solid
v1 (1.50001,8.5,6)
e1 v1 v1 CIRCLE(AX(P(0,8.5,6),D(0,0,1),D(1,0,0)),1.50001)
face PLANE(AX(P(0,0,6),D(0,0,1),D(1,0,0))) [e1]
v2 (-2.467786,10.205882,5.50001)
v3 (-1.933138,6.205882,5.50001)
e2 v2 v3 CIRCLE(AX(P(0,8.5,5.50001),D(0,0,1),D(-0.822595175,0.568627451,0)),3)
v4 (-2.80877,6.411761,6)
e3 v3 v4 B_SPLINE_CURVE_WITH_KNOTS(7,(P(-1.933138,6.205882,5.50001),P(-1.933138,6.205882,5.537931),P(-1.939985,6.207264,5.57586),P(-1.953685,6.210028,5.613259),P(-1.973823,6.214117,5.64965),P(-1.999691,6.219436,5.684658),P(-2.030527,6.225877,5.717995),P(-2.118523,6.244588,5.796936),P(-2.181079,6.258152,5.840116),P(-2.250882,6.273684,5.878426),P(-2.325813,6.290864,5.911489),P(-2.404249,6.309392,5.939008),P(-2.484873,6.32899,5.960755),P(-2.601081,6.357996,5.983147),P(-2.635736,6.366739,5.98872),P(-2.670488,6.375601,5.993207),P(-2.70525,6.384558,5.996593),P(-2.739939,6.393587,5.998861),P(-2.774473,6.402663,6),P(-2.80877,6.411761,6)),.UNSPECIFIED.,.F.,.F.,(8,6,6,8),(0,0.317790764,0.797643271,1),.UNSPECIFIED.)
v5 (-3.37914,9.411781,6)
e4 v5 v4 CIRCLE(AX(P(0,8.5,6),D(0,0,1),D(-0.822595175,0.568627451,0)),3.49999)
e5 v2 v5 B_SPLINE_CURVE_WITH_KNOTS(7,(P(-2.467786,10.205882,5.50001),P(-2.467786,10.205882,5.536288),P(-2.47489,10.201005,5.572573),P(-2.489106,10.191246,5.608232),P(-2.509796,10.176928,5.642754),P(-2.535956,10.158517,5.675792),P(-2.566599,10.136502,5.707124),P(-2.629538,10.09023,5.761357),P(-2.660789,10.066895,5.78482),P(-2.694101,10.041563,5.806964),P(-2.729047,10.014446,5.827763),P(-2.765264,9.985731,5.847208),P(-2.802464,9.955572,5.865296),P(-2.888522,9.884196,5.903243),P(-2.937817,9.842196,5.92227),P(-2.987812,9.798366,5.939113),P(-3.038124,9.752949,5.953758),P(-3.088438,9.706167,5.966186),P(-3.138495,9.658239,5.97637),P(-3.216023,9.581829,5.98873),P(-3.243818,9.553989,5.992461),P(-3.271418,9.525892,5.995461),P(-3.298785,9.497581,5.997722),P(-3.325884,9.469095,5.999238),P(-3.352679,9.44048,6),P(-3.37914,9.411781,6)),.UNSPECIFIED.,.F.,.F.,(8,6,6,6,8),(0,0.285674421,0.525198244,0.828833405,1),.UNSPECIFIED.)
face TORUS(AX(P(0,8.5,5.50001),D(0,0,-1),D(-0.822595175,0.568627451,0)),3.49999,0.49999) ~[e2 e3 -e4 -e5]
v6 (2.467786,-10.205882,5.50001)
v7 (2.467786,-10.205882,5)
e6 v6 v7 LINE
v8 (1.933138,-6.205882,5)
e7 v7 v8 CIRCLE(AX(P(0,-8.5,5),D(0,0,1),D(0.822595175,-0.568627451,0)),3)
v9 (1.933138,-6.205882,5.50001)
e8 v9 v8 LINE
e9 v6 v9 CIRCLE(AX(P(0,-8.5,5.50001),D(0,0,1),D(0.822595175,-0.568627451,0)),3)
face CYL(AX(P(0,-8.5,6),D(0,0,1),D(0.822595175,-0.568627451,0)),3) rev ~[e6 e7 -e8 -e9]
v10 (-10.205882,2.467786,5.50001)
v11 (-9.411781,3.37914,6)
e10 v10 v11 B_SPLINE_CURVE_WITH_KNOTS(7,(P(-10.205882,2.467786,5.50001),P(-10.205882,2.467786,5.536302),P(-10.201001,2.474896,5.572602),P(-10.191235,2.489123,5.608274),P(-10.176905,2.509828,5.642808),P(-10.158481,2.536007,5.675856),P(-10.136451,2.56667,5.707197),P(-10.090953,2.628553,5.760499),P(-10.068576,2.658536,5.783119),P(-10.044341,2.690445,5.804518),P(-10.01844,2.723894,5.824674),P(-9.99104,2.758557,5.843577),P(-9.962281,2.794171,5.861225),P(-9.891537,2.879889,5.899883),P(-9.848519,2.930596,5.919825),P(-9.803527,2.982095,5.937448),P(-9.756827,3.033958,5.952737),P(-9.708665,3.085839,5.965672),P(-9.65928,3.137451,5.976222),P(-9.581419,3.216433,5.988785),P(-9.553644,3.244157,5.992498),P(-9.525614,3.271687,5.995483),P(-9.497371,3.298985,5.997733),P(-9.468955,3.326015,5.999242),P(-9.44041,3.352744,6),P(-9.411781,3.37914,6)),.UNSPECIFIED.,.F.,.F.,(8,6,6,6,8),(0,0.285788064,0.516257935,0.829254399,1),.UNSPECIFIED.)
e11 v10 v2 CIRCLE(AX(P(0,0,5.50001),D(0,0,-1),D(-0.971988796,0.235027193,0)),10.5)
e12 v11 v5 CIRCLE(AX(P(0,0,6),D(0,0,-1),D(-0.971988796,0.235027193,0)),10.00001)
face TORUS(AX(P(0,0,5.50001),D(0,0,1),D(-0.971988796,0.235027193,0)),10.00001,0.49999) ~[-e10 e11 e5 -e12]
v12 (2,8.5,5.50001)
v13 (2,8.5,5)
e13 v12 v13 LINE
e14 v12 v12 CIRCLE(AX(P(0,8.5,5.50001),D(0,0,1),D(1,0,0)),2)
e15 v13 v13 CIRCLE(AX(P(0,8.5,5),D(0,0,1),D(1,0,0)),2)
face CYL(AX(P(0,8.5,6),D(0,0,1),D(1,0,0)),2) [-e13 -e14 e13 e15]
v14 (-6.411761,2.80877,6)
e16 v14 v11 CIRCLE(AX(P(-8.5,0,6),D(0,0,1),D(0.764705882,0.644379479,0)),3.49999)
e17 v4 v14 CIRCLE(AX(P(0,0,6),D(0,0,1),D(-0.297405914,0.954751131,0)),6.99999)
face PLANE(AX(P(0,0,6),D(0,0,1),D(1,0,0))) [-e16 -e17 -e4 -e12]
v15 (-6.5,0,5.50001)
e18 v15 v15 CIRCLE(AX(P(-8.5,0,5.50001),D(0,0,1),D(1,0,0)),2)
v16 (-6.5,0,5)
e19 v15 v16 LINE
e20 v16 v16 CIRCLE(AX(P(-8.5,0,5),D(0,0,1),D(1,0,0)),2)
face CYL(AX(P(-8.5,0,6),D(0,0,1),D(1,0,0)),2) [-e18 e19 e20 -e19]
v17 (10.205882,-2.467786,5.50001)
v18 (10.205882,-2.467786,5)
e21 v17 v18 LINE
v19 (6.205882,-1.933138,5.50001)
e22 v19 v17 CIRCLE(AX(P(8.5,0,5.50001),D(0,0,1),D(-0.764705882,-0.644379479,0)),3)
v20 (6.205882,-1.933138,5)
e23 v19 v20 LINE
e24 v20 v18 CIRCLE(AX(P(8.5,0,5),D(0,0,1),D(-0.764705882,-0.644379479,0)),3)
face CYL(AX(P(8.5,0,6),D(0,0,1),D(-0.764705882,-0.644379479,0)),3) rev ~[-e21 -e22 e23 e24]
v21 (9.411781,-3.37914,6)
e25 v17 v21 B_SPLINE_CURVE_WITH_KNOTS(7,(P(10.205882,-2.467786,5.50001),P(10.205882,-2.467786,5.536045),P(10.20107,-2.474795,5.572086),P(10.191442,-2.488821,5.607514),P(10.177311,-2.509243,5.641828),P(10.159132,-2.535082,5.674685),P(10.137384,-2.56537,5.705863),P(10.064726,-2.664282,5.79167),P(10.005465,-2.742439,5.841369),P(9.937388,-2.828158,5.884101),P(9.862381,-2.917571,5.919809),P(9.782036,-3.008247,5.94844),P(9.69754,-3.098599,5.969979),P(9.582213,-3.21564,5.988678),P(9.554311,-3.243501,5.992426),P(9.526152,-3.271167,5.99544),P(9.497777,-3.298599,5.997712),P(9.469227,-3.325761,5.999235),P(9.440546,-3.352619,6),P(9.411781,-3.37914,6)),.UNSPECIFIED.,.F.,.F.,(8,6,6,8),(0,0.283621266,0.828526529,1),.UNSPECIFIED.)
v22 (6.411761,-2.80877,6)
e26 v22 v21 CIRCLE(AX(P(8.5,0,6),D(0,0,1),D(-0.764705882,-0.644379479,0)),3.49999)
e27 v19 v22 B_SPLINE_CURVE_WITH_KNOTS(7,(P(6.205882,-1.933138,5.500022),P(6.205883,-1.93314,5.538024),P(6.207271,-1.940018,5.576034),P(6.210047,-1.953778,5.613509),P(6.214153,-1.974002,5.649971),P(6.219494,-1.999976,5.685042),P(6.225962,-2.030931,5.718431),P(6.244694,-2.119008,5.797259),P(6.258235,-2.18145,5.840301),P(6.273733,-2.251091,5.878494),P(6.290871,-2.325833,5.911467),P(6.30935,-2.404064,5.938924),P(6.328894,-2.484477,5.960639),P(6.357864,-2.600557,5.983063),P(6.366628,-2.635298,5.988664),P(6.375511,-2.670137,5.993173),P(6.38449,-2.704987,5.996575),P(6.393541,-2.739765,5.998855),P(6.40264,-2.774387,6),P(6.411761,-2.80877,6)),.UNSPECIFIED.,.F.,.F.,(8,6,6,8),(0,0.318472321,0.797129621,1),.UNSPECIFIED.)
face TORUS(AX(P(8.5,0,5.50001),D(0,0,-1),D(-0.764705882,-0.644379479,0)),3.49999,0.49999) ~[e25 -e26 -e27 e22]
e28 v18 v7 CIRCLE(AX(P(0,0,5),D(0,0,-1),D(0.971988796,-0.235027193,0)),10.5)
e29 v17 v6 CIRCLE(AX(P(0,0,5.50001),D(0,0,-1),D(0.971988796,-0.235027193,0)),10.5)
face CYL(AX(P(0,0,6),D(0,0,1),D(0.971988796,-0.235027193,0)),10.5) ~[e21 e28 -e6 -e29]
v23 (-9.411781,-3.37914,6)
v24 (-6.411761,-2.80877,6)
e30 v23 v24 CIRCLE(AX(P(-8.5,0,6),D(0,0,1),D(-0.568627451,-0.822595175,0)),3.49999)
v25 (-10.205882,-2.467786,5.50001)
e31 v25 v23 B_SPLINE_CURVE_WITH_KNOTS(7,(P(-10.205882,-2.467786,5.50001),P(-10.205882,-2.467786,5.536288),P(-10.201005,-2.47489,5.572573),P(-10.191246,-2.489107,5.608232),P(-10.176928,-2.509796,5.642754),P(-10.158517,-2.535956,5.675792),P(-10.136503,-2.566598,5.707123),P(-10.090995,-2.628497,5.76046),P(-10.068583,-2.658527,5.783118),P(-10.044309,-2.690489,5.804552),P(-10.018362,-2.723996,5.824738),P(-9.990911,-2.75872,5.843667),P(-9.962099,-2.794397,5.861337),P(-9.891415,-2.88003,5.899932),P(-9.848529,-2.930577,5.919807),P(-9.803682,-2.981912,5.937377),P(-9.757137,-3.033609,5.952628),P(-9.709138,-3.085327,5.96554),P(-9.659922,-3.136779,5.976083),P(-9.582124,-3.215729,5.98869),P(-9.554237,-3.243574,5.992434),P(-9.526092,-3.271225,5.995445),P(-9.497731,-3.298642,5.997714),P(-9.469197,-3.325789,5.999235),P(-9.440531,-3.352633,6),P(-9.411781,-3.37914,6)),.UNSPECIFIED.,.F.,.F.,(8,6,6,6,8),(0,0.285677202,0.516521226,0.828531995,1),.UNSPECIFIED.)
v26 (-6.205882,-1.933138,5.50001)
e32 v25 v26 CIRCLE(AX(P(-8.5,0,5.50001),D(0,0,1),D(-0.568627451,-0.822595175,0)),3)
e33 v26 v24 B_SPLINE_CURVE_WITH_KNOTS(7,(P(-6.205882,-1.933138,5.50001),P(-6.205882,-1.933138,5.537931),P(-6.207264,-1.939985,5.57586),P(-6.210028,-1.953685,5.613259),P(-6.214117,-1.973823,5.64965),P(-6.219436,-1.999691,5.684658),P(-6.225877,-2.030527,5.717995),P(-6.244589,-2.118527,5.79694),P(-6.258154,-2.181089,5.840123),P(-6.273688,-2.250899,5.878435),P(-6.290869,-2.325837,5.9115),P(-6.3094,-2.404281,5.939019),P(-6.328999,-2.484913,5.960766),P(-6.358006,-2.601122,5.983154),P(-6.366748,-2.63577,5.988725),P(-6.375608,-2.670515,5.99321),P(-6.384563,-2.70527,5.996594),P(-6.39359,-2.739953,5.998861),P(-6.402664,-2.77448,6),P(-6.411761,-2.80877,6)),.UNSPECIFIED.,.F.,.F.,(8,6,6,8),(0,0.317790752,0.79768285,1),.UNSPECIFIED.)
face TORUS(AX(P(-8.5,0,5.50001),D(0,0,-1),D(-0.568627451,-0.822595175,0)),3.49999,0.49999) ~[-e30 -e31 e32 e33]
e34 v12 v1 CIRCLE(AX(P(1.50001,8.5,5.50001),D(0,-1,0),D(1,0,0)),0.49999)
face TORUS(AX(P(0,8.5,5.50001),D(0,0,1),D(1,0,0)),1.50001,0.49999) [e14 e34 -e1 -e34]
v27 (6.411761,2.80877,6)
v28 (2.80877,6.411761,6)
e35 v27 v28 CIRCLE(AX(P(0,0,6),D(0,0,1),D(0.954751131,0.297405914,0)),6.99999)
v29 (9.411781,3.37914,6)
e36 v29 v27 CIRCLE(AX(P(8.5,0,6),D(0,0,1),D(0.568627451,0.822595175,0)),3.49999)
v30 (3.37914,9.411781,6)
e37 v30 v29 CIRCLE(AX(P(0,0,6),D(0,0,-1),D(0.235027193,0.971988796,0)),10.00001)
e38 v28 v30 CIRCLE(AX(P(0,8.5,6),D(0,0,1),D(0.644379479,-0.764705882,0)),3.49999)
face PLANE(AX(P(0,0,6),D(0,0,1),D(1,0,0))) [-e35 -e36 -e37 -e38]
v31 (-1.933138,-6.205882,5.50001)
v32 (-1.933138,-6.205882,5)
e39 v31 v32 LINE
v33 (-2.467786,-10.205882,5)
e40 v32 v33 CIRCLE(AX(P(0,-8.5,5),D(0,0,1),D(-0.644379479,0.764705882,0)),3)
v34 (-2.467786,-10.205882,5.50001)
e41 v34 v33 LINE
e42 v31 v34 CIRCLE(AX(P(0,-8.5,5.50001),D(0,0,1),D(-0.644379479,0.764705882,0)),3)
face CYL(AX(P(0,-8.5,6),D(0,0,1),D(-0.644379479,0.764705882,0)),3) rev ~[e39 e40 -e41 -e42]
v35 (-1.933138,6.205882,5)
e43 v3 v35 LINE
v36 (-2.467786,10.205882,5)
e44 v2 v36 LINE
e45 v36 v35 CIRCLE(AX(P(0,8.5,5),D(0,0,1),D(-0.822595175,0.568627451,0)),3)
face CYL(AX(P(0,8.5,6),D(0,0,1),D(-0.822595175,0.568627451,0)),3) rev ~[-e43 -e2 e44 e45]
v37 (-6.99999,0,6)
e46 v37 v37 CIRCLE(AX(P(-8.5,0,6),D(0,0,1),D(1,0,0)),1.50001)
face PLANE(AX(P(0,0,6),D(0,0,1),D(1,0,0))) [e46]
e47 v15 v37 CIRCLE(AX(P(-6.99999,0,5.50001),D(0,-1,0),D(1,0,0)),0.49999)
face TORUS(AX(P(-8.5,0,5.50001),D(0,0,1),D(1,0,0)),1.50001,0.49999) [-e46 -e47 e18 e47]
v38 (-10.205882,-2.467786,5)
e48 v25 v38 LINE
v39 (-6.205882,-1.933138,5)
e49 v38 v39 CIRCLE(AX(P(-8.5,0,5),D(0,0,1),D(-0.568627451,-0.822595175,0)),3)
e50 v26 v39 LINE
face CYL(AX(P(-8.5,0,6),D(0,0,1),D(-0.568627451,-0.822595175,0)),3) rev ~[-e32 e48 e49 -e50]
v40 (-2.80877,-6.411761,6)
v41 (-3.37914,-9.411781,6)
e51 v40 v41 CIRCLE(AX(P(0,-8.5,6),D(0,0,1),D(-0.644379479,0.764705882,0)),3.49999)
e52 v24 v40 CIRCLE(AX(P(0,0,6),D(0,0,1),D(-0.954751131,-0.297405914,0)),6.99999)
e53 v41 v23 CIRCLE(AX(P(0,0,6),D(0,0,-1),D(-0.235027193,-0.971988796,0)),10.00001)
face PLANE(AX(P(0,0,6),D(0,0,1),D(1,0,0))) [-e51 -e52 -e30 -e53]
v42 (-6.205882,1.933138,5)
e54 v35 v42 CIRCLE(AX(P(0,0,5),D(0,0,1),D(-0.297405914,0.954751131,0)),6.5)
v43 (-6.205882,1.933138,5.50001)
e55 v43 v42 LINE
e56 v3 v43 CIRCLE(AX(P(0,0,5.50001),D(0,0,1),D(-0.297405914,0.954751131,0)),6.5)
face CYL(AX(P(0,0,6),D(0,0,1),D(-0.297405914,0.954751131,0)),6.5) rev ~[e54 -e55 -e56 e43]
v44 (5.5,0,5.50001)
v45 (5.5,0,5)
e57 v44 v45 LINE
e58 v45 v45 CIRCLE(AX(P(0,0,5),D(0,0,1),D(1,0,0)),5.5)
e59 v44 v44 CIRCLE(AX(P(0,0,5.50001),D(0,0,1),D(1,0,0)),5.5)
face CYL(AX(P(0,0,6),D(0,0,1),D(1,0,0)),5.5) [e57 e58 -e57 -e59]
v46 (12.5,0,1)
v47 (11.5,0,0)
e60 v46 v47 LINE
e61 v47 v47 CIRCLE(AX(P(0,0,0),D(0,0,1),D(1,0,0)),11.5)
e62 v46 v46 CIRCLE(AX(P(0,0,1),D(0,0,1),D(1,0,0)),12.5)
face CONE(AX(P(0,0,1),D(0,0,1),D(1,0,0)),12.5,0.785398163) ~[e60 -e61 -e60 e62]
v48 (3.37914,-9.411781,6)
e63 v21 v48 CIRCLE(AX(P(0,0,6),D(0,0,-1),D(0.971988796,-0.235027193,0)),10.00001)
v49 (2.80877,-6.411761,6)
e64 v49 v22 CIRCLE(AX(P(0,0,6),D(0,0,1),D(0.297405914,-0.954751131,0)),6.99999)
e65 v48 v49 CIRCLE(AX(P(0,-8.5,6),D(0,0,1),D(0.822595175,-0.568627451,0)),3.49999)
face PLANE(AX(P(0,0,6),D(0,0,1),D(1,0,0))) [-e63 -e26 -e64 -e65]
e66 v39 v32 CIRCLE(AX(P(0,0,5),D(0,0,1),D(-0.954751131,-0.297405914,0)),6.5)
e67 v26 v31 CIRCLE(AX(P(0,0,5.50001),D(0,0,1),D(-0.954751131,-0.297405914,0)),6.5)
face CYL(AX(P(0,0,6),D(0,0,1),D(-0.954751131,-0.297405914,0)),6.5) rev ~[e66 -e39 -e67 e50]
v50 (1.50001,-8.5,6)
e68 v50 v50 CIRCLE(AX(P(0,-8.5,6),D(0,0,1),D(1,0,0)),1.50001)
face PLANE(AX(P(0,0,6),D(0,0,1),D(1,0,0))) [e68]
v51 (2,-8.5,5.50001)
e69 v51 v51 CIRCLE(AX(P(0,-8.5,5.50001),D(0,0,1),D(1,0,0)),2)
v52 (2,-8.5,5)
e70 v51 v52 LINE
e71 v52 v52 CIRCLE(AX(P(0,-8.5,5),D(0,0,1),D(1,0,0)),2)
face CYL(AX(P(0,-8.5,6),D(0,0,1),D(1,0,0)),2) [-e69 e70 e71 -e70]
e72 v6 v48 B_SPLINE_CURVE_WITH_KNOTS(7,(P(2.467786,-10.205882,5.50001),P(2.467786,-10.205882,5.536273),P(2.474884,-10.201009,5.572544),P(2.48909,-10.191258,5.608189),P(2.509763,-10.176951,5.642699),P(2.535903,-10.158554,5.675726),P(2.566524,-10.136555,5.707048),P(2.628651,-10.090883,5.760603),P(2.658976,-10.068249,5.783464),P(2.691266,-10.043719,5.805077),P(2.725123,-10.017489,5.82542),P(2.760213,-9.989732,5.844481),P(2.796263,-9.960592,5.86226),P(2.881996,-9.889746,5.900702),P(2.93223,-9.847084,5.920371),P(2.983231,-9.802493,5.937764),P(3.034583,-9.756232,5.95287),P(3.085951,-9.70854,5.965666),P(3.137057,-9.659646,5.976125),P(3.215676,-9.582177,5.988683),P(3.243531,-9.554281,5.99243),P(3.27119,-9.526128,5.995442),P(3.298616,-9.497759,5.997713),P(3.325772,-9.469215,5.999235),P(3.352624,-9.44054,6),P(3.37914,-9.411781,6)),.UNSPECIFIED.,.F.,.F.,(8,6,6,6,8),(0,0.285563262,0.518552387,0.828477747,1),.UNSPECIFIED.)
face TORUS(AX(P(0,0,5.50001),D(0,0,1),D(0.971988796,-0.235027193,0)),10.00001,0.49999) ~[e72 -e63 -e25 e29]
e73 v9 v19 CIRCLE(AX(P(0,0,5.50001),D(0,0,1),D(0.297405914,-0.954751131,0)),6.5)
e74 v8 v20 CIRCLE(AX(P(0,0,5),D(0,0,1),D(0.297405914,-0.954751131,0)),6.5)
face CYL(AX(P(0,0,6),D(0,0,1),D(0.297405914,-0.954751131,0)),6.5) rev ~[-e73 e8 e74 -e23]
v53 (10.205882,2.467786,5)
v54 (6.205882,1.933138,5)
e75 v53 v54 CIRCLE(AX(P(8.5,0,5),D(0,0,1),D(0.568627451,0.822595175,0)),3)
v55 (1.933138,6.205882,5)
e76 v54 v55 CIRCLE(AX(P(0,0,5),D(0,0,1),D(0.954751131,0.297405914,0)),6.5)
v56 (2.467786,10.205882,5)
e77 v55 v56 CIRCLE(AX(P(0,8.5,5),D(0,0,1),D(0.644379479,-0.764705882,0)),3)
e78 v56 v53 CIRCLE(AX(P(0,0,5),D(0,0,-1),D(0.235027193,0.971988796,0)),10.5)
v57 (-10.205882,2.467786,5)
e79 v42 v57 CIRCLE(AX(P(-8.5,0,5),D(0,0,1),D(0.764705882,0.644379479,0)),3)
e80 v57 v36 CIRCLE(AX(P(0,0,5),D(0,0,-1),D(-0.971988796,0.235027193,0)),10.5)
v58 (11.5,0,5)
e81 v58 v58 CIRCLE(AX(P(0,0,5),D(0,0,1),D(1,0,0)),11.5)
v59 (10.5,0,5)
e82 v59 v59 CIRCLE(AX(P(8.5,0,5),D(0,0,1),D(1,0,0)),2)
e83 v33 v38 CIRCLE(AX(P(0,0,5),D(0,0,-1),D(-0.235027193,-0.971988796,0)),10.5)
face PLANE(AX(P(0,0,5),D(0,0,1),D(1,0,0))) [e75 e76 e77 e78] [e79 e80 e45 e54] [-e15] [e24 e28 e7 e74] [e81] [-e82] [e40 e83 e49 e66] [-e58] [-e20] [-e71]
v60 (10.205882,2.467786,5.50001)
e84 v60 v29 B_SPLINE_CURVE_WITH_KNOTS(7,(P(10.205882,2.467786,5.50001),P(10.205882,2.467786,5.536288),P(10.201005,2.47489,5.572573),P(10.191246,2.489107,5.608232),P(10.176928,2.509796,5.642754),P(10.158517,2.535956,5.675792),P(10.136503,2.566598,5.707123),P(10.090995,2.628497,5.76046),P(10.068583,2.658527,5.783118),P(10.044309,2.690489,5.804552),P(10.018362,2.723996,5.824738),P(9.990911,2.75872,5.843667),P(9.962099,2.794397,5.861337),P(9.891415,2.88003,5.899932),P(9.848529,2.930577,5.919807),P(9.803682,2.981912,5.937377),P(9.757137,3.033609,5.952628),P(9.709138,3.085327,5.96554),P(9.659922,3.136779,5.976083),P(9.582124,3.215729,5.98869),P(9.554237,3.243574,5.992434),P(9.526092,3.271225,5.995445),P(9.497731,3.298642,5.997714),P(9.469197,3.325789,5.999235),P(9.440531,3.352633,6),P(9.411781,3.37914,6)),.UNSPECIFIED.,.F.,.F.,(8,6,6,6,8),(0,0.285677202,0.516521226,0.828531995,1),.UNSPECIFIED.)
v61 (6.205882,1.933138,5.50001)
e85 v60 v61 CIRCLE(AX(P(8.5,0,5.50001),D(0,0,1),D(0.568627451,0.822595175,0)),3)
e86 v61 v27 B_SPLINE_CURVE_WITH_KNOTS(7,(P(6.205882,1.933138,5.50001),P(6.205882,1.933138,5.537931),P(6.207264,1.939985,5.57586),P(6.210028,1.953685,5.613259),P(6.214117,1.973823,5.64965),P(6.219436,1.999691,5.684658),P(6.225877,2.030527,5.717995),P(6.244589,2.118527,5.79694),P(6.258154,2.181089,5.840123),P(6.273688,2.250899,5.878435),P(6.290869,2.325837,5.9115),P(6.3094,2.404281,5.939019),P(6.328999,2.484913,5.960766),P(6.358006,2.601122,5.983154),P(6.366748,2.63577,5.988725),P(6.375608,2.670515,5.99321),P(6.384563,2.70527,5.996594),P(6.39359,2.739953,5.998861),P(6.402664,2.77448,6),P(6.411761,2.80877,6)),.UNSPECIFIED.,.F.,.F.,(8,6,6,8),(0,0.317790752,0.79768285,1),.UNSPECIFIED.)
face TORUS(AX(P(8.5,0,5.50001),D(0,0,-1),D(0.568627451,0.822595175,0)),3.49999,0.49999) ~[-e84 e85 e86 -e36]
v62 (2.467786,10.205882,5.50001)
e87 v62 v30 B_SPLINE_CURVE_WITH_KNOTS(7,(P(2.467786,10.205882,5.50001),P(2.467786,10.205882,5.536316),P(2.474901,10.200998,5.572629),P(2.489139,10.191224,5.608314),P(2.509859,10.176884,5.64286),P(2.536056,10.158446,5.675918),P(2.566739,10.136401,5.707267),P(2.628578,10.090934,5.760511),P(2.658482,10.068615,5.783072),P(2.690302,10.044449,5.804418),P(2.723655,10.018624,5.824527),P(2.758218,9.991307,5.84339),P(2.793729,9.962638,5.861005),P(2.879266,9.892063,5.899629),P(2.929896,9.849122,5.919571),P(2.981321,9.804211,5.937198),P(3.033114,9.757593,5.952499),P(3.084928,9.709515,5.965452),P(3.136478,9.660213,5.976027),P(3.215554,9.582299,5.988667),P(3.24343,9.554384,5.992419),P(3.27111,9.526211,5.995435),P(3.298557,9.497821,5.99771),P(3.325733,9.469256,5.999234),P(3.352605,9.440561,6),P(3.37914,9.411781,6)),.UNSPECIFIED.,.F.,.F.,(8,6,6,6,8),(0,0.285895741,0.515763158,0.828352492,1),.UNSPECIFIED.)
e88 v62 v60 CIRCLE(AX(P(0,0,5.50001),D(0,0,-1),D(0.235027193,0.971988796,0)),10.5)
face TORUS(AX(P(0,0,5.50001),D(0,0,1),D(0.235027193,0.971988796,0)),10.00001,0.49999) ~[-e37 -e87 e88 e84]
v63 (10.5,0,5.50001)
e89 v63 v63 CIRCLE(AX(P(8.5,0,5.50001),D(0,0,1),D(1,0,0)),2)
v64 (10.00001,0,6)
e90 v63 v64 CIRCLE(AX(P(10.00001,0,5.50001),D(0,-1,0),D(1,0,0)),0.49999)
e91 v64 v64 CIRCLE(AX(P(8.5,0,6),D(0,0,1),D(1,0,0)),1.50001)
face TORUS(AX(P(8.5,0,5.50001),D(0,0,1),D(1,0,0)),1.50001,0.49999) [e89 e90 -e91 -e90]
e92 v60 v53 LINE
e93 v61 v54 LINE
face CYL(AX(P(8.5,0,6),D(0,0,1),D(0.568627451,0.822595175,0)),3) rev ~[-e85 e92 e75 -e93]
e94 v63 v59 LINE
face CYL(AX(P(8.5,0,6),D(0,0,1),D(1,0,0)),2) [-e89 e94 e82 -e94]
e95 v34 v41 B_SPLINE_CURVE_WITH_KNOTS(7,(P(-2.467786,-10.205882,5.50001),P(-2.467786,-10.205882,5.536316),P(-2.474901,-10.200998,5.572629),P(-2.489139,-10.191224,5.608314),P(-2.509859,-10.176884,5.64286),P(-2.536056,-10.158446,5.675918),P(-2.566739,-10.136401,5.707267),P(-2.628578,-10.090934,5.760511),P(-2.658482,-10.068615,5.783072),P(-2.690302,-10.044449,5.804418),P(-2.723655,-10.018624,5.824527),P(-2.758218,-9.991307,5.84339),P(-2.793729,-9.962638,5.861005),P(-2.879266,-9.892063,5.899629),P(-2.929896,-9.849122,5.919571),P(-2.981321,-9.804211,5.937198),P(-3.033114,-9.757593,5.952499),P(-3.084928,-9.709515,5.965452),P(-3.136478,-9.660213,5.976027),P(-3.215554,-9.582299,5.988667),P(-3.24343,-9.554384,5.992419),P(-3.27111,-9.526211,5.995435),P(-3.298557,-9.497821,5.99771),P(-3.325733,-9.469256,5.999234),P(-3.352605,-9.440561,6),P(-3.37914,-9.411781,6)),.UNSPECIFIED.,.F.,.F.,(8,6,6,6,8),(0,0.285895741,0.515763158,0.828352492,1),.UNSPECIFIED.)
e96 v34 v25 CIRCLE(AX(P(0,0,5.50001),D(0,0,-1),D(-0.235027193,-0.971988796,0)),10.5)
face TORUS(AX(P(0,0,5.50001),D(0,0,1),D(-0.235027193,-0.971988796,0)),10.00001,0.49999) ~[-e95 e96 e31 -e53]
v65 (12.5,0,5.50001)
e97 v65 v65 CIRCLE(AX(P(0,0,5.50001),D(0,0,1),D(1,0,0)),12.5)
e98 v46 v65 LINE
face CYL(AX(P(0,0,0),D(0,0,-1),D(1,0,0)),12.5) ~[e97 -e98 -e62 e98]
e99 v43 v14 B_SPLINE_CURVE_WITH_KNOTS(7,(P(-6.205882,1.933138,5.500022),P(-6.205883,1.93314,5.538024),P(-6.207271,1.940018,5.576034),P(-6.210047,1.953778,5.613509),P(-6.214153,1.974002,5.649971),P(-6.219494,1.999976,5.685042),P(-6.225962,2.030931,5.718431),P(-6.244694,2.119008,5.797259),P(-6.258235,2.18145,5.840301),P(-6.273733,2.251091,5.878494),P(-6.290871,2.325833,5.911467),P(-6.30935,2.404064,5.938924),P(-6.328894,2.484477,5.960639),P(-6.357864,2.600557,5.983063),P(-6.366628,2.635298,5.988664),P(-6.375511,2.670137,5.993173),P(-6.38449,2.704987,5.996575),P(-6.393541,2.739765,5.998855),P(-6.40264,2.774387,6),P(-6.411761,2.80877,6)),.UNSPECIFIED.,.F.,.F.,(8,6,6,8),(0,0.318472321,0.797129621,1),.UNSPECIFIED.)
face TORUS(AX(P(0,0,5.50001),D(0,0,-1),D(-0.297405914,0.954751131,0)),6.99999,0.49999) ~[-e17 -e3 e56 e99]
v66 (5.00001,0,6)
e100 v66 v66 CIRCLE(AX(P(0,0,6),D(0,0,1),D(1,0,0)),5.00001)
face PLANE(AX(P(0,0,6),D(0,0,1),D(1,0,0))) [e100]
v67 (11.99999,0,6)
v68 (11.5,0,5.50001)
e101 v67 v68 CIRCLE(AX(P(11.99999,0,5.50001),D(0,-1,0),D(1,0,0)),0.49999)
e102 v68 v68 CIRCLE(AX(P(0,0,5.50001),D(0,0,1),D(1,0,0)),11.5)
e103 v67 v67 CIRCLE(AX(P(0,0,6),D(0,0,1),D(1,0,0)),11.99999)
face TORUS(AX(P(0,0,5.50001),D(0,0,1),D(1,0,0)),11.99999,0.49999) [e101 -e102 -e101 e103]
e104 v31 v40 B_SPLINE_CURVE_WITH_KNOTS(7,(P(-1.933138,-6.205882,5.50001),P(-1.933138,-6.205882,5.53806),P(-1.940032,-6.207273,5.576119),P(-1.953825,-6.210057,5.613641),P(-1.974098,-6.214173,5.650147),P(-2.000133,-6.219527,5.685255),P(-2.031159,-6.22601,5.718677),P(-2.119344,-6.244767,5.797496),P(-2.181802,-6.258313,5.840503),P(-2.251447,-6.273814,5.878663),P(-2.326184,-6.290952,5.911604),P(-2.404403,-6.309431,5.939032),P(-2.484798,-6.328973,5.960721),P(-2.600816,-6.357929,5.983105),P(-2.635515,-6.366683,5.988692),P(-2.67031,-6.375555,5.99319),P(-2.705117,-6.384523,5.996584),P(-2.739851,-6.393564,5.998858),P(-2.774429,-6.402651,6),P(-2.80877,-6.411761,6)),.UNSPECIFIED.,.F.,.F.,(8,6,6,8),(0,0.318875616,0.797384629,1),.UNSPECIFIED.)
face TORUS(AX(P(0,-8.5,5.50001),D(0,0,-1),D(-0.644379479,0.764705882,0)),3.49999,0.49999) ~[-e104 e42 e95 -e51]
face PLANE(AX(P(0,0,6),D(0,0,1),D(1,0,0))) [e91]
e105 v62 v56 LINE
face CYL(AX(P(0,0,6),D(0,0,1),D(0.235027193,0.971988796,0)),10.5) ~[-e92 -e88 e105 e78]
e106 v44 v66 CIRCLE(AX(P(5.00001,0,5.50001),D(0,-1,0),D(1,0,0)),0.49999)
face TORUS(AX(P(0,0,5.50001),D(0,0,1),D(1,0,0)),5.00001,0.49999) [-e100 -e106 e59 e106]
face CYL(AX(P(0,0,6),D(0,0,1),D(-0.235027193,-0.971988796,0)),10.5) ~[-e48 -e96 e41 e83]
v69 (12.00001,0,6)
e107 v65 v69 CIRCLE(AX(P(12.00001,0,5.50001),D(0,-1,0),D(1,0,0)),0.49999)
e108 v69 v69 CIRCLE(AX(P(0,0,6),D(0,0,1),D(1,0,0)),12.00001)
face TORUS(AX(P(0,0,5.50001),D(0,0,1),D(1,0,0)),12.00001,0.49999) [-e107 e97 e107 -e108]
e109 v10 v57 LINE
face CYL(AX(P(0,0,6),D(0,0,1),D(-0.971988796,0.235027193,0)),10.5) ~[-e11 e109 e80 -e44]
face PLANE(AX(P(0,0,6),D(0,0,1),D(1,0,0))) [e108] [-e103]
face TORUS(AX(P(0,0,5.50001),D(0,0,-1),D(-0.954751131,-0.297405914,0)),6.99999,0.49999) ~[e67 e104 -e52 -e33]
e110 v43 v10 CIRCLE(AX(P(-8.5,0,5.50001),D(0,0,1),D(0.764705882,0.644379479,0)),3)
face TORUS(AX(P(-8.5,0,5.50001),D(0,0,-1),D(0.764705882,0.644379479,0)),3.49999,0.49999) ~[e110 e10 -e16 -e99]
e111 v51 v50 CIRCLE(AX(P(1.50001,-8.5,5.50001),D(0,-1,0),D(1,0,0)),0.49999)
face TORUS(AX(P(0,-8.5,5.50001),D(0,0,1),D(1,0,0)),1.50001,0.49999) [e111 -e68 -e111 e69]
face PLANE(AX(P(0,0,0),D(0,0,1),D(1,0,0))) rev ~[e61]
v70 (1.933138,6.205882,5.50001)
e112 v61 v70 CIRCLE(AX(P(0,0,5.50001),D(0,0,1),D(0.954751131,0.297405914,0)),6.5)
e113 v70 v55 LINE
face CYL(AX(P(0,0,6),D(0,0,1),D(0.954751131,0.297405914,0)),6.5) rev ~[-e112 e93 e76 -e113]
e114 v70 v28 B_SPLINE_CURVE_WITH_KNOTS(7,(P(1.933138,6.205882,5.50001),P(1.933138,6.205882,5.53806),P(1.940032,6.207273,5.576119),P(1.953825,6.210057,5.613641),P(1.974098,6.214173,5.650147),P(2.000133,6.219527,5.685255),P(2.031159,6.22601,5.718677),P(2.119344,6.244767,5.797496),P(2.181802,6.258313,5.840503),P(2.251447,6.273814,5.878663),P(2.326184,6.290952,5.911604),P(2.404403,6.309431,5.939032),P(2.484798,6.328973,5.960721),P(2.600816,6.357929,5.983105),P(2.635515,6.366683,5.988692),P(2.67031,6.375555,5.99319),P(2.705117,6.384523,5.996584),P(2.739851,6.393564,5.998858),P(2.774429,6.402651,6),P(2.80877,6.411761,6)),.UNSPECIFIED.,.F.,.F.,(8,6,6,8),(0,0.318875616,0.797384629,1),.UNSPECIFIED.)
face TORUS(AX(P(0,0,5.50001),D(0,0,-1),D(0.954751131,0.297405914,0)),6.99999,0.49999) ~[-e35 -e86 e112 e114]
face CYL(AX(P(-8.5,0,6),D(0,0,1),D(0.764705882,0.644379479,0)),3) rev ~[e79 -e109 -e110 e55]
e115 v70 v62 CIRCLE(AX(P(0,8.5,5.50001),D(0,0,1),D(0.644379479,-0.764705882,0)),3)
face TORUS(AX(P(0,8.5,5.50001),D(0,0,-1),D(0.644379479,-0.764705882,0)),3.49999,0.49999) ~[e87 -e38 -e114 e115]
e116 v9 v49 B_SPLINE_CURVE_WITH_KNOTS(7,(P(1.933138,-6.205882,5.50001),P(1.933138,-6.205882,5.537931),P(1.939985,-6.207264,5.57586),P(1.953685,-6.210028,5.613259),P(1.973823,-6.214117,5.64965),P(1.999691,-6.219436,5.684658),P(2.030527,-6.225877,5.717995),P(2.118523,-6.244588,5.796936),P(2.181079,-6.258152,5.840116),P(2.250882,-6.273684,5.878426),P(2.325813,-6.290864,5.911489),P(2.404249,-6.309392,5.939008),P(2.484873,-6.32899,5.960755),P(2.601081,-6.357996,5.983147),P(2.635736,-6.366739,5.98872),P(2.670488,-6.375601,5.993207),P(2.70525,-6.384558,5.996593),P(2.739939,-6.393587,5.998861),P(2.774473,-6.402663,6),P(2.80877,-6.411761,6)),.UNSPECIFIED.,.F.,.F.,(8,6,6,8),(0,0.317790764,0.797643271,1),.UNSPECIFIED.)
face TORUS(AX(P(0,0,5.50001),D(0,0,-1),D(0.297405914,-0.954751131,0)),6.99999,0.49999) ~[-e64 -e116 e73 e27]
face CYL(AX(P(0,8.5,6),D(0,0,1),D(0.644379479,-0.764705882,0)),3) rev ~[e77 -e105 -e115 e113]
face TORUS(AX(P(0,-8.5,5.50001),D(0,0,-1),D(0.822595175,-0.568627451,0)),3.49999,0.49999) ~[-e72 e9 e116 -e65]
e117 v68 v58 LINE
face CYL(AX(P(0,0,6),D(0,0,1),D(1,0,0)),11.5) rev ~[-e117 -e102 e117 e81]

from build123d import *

# Parameters (mm, degrees)
F0_R     = 12.5
F1_DEPTH = 6
F2_R     = 11.5
F2_R_2   = 2
F2_R_3   = 5.5
F3_DEPTH = 1
F4_SIZE  = 1
F5_R     = 0.49999


# Not quite as in the source:
# - a fillet or chamfer is up to 0.001 mm smaller than in the source, because OpenCascade refuses the exact size


with BuildPart() as f1:
    # F0 (on Top) → F1 (new body)
    with BuildSketch(Plane.XY):
        Circle(F0_R)
    extrude(amount=F1_DEPTH)

    # F2 (on face) → F3 (cut)
    with BuildSketch(Plane.XY.offset(6)):
        Circle(F2_R)
        with BuildLine():
            ThreePointArc((-10.2058823529, -2.4677855251), (-8.1025492896, -2.9735556045), (-6.2058823529, -1.9331384383))
            ThreePointArc((-6.2058823529, -1.9331384383), (-4.5961940777, -4.5961940777), (-1.9331384383, -6.2058823529))
            ThreePointArc((-1.9331384383, -6.2058823529), (-2.9735556045, -8.1025492896), (-2.4677855251, -10.2058823529))
            ThreePointArc((-2.4677855251, -10.2058823529), (-7.4246212025, -7.4246212025), (-10.2058823529, -2.4677855251))
        make_face(mode=Mode.SUBTRACT)
        with Locations((0, -8.5)):
            Circle(F2_R_2, mode=Mode.SUBTRACT)
        with BuildLine():
            ThreePointArc((10.2058823529, -2.4677855251), (7.4246212025, -7.4246212025), (2.4677855251, -10.2058823529))
            ThreePointArc((2.4677855251, -10.2058823529), (2.9735556045, -8.1025492896), (1.9331384383, -6.2058823529))
            ThreePointArc((1.9331384383, -6.2058823529), (4.5961940777, -4.5961940777), (6.2058823529, -1.9331384383))
            ThreePointArc((6.2058823529, -1.9331384383), (8.1025492896, -2.9735556045), (10.2058823529, -2.4677855251))
        make_face(mode=Mode.SUBTRACT)
        with Locations((-8.5, 0)):
            Circle(F2_R_2, mode=Mode.SUBTRACT)
        with BuildLine():
            ThreePointArc((-10.2058823529, 2.4677855251), (-7.4246212025, 7.4246212025), (-2.4677855251, 10.2058823529))
            ThreePointArc((-2.4677855251, 10.2058823529), (-2.9735556045, 8.1025492896), (-1.9331384383, 6.2058823529))
            ThreePointArc((-1.9331384383, 6.2058823529), (-4.5961940777, 4.5961940777), (-6.2058823529, 1.9331384383))
            ThreePointArc((-6.2058823529, 1.9331384383), (-8.1025492896, 2.9735556045), (-10.2058823529, 2.4677855251))
        make_face(mode=Mode.SUBTRACT)
        Circle(F2_R_3, mode=Mode.SUBTRACT)
        with Locations((8.5, 0)):
            Circle(F2_R_2, mode=Mode.SUBTRACT)
        with Locations((0, 8.5)):
            Circle(F2_R_2, mode=Mode.SUBTRACT)
        with BuildLine():
            ThreePointArc((2.4677855251, 10.2058823529), (7.4246212025, 7.4246212025), (10.2058823529, 2.4677855251))
            ThreePointArc((10.2058823529, 2.4677855251), (8.1025492896, 2.9735556045), (6.2058823529, 1.9331384383))
            ThreePointArc((6.2058823529, 1.9331384383), (4.5961940777, 4.5961940777), (1.9331384383, 6.2058823529))
            ThreePointArc((1.9331384383, 6.2058823529), (2.9735556045, 8.1025492896), (2.4677855251, 10.2058823529))
        make_face(mode=Mode.SUBTRACT)
    extrude(amount=-F3_DEPTH, mode=Mode.SUBTRACT)

    # F4
    f4_edges = [f1.edges().sort_by_distance(p)[0] for p in [
        (-12.5, 0, 0),
    ]]
    chamfer(f4_edges, length=F4_SIZE)

    # F5 (radius 0.5 in the source; OpenCascade refuses exactly that, so slightly less here)
    f5_edges = [f1.edges().sort_by_distance(p)[0] for p in [
        (-12.5, 0, 6),
        (-11.5, 0, 6),
        (-2.973556, 8.102549, 6),
        (-4.596194, 4.596194, 6),
        (-8.102549, 2.973556, 6),
        (-7.424621, 7.424621, 6),
        (-10.5, 0, 6),
        (-2.973556, -8.102549, 6),
        (-7.424621, -7.424621, 6),
        (-8.102549, -2.973556, 6),
        (-4.596194, -4.596194, 6),
        (-2, -8.5, 6),
        (7.424621, -7.424621, 6),
        (2.973556, -8.102549, 6),
        (4.596194, -4.596194, 6),
        (8.102549, -2.973556, 6),
        (6.5, 0, 6),
        (2.973556, 8.102549, 6),
        (7.424621, 7.424621, 6),
        (8.102549, 2.973556, 6),
        (4.596194, 4.596194, 6),
        (-2, 8.5, 6),
        (-5.5, 0, 6),
    ]]
    fillet(f5_edges, radius=F5_R)


solid = f1.part
